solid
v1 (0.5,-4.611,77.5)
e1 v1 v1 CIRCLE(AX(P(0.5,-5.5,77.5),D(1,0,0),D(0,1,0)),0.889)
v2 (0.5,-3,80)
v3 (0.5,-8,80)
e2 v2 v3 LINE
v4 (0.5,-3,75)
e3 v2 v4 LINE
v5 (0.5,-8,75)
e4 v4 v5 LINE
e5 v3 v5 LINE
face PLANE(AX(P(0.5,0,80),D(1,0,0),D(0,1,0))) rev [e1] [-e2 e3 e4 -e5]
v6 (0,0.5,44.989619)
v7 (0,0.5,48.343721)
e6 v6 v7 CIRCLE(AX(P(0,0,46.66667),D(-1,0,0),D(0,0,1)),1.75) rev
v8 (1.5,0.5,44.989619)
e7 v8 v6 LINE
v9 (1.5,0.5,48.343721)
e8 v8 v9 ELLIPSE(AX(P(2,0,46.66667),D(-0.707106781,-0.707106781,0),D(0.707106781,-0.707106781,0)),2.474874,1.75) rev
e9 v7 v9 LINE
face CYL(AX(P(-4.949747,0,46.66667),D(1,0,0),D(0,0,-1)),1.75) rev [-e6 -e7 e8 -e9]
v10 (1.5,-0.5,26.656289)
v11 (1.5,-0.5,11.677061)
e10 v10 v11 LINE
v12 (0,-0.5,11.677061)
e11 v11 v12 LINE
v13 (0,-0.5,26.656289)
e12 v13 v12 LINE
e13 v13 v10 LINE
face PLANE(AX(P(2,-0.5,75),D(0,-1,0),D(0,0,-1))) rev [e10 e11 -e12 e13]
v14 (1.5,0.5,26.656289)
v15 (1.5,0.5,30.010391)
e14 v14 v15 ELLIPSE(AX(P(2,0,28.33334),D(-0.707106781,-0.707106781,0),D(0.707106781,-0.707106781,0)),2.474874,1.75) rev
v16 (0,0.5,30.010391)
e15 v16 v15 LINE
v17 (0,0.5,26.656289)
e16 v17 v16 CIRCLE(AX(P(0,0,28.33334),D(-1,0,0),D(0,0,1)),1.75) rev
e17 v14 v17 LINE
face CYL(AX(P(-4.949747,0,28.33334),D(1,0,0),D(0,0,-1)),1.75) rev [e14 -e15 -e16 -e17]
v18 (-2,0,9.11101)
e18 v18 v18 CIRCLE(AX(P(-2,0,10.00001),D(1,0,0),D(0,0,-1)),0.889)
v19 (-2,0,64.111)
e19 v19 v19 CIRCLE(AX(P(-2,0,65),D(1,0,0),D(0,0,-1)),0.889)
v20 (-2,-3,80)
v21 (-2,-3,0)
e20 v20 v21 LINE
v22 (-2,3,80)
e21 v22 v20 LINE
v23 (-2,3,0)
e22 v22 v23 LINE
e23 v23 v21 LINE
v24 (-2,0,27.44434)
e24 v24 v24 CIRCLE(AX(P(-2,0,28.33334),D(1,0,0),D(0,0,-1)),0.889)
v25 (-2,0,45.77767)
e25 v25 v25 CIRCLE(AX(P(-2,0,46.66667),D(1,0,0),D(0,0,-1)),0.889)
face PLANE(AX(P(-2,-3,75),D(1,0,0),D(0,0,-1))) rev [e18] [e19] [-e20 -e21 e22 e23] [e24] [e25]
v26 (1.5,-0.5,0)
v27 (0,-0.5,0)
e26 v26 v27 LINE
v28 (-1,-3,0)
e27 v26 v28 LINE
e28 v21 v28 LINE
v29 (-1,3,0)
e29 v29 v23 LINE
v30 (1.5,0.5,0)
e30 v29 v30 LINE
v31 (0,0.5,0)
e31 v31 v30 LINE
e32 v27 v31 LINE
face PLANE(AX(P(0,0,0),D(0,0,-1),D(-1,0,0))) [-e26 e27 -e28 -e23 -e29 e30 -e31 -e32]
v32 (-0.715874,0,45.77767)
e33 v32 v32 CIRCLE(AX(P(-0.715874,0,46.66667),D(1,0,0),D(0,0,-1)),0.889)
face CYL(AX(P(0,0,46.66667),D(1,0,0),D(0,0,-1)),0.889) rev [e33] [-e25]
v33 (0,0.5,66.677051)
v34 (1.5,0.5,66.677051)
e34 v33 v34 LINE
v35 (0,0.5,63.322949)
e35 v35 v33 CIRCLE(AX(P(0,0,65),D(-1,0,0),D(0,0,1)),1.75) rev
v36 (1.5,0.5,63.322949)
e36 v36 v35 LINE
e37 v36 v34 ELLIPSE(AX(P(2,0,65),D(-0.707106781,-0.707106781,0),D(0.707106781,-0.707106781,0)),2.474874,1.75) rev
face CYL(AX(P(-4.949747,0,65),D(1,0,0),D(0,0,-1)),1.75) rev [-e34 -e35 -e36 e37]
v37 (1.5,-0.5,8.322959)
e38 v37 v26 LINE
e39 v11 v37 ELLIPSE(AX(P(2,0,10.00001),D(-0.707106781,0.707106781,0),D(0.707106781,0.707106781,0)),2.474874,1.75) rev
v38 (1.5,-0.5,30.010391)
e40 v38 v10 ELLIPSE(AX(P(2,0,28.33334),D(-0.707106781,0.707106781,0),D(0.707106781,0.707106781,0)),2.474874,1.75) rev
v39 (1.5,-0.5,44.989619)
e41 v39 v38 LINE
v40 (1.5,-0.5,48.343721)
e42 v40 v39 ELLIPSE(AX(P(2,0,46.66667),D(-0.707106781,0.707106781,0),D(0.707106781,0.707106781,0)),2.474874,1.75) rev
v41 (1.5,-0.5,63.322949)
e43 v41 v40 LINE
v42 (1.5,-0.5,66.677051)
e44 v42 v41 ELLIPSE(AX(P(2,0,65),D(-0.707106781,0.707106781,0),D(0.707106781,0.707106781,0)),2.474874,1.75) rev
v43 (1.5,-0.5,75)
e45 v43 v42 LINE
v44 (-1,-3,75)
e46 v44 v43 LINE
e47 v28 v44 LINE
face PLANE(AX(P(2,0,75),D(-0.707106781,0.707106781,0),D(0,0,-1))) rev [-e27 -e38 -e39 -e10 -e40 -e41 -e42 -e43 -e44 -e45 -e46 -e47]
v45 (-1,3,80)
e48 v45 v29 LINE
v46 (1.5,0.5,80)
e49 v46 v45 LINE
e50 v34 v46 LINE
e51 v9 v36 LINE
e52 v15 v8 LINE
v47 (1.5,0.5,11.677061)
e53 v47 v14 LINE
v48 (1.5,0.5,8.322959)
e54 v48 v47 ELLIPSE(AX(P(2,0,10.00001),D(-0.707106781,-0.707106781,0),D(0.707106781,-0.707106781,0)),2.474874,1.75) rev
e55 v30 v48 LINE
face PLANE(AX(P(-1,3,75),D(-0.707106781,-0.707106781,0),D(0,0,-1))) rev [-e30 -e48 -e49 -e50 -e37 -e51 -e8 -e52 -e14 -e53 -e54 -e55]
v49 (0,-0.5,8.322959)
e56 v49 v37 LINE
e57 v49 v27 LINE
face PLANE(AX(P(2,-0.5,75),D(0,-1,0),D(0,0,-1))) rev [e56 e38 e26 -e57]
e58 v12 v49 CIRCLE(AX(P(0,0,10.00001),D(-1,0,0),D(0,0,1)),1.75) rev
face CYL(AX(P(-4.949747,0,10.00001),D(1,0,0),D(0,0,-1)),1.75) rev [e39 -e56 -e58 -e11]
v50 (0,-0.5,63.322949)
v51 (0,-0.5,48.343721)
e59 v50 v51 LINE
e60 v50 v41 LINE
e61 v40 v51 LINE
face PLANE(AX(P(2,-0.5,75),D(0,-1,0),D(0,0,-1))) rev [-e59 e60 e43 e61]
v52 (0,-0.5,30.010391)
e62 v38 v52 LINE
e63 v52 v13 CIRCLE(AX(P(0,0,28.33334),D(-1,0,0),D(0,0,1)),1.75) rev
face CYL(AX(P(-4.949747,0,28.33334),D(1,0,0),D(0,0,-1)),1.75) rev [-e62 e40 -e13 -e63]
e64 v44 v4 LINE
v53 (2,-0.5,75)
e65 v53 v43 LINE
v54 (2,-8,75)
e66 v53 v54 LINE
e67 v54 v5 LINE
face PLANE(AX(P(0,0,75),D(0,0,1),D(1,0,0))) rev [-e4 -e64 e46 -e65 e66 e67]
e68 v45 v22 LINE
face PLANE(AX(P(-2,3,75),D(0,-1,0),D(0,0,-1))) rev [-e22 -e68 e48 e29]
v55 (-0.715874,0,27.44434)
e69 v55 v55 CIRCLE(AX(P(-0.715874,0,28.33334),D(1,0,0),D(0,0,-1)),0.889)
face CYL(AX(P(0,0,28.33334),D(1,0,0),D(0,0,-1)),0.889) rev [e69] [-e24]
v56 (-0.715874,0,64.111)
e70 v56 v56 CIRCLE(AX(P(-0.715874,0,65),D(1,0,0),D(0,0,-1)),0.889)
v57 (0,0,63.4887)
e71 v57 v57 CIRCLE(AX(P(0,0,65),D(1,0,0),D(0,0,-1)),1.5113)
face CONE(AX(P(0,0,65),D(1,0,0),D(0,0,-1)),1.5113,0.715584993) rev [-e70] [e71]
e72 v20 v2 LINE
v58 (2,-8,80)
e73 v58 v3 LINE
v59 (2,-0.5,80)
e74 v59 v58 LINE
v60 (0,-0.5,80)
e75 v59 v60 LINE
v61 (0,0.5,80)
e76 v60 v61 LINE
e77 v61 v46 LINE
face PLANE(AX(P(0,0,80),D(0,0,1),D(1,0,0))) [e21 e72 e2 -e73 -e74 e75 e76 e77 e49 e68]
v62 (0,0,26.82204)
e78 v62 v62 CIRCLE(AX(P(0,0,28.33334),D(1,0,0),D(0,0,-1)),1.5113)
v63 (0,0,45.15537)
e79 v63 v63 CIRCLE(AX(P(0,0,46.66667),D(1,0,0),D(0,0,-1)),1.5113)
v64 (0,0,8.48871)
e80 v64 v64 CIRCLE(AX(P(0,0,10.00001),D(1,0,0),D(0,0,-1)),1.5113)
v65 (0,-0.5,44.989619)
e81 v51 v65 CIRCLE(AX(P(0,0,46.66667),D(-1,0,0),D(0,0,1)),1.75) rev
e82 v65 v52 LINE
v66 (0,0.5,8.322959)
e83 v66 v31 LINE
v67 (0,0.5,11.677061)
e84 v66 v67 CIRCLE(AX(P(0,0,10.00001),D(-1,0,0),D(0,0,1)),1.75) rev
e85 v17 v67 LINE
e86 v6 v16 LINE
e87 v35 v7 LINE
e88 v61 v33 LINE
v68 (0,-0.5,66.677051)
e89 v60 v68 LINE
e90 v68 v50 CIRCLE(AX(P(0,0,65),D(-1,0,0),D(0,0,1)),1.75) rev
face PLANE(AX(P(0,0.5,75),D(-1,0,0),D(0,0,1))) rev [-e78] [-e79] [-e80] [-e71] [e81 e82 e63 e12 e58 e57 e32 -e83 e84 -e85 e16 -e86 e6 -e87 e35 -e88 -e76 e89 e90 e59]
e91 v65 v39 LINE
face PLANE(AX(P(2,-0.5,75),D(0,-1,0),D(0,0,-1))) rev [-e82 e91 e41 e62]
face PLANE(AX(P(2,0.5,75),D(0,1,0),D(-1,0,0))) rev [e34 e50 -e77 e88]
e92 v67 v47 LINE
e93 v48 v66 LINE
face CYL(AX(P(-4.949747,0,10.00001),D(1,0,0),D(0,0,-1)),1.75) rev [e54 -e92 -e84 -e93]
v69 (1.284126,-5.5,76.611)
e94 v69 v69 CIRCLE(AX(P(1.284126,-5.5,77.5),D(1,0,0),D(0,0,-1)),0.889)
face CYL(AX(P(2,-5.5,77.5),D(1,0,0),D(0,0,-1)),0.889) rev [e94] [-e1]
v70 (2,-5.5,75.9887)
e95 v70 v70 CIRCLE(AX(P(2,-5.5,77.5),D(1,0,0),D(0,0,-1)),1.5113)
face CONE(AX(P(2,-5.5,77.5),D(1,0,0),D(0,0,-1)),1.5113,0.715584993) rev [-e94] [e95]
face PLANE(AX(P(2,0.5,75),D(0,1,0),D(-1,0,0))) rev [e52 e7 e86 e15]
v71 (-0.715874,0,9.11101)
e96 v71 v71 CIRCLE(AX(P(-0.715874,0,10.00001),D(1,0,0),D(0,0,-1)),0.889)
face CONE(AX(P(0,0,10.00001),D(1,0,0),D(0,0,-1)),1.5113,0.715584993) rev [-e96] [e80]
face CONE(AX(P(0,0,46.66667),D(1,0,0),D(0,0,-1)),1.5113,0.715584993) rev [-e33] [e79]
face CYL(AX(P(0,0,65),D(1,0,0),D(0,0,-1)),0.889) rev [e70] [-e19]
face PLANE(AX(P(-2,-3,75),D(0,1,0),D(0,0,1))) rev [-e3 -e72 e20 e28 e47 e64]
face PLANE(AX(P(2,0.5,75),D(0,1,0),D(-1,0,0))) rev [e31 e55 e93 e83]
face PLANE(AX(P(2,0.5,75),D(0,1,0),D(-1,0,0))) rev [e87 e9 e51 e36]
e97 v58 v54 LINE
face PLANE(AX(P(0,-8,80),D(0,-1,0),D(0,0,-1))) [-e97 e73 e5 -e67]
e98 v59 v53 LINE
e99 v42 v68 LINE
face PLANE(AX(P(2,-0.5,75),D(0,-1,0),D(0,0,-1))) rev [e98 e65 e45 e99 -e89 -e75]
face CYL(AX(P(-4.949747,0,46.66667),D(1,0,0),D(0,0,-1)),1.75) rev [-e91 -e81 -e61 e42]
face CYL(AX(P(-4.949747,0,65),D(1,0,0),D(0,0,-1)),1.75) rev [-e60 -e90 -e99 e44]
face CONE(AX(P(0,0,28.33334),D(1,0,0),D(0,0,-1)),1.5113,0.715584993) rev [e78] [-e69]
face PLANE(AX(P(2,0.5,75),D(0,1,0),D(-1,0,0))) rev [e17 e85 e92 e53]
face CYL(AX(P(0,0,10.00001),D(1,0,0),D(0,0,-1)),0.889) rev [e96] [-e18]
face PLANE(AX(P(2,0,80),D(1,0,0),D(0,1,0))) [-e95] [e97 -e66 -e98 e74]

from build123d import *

# Parameters (mm, degrees)
BOSS_EXTRUDE1_DEPTH                            = 75
SKETCH5_R                                      = 1.75
CUT_EXTRUDE1_DEPTH                             = 2
CSK_FOR_0_FLAT_HEAD_MACHINE_SCREW2_D           = 1.778
CSK_FOR_0_FLAT_HEAD_MACHINE_SCREW2_DEPTH       = 3.302
CSK_FOR_0_FLAT_HEAD_MACHINE_SCREW2_CSINK_D     = 3.0226
CSK_FOR_0_FLAT_HEAD_MACHINE_SCREW2_CSINK_ANGLE = 82
CSK_FOR_0_FLAT_HEAD_MACHINE_SCREW2_TIP         = 0.53416509
CHAMFER1_SIZE                                  = 3
SKETCH6_W                                      = 1.5
SKETCH6_H                                      = 5
BOSS_EXTRUDE2_DEPTH                            = 5
CSK_FOR_0_FLAT_HEAD_MACHINE_SCREW1_D           = 1.778
CSK_FOR_0_FLAT_HEAD_MACHINE_SCREW1_DEPTH       = 3.302
CSK_FOR_0_FLAT_HEAD_MACHINE_SCREW1_CSINK_D     = 3.0226
CSK_FOR_0_FLAT_HEAD_MACHINE_SCREW1_CSINK_ANGLE = 82
CSK_FOR_0_FLAT_HEAD_MACHINE_SCREW1_TIP         = 0.53416509


with BuildPart() as part:
    # Sketch1 → Boss-Extrude1 (new body)
    with BuildSketch(Plane.XY):
        Polygon((-2, -3), (2, -3), (2, -0.5), (0, -0.5), (0, 0.5), (2, 0.5), (2, 3), (-2, 3), align=None)
    extrude(amount=BOSS_EXTRUDE1_DEPTH)

    # Sketch5 → Cut-Extrude1 (cut)
    with BuildSketch(Plane(origin=(2, 0, 0), x_dir=(0, 0, -1), z_dir=(1, 0, 0))):
        with Locations((-65, 0)):
            Circle(SKETCH5_R)
        with Locations((-46.66667, 0)):
            Circle(SKETCH5_R)
        with Locations((-28.33334, 0)):
            Circle(SKETCH5_R)
        with Locations((-10.00001, 0)):
            Circle(SKETCH5_R)
    extrude(amount=-CUT_EXTRUDE1_DEPTH, mode=Mode.SUBTRACT)

    # CSK for #0 Flat Head Machine Screw2
    with Locations(Plane(origin=(0, 0, 0), x_dir=(0, 0, -1), z_dir=(1, 0, 0))):
        with Locations((-65, 0), (-10.00001, 0), (-46.66667, 0), (-28.33334, 0)):
            CounterSinkHole(CSK_FOR_0_FLAT_HEAD_MACHINE_SCREW2_D / 2, CSK_FOR_0_FLAT_HEAD_MACHINE_SCREW2_CSINK_D / 2, depth=CSK_FOR_0_FLAT_HEAD_MACHINE_SCREW2_DEPTH, counter_sink_angle=CSK_FOR_0_FLAT_HEAD_MACHINE_SCREW2_CSINK_ANGLE)
            with Locations((0, 0, -(CSK_FOR_0_FLAT_HEAD_MACHINE_SCREW2_DEPTH + CSK_FOR_0_FLAT_HEAD_MACHINE_SCREW2_TIP / 2))):  # 118° drill point
                Cone(0, CSK_FOR_0_FLAT_HEAD_MACHINE_SCREW2_D / 2, CSK_FOR_0_FLAT_HEAD_MACHINE_SCREW2_TIP, mode=Mode.SUBTRACT)

    # Chamfer1
    # the kernel refuses this chamfer: 3 mm, written as the material it takes off along each edge
    with BuildSketch(Plane(origin=(2, -3, -7.715048964), x_dir=(-0.9996219169112968, -0.027495876610586348, 0), z_dir=(0, 0, 1))) as chamfer1_piece_1:
        Polygon((CHAMFER1_SIZE * 0.999621916911, -CHAMFER1_SIZE * 0.0274958766106), (-CHAMFER1_SIZE * 0.0274958766106, -CHAMFER1_SIZE * 0.999621916911), (0, 0), align=None)
    extrude(amount=90.430097928, mode=Mode.SUBTRACT)
    with BuildSketch(Plane(origin=(2, 3, -7.715048964), x_dir=(-0.9996219169112968, 0.027495876610586348, 0), z_dir=(0, 0, 1))) as chamfer1_piece_2:
        Polygon((CHAMFER1_SIZE * 0.999621916911, CHAMFER1_SIZE * 0.0274958766106), (-CHAMFER1_SIZE * 0.0274958766106, CHAMFER1_SIZE * 0.999621916911), (0, 0), align=None)
    extrude(amount=90.430097928, mode=Mode.SUBTRACT)

    # Sketch6 → Boss-Extrude2 (add)
    with BuildSketch(Plane.XY.offset(75)):
        Polygon((-2, 3), (-2, -3), (-1, -3), (1.5, -0.5), (0, -0.5), (0, 0.5), (1.5, 0.5), (-1, 3), align=None)
        Polygon((1.5, -0.5), (-1, -3), (0.5, -3), (2, -3), (2, -0.5), align=None)
        with Locations((1.25, -5.5)):
            Rectangle(SKETCH6_W, SKETCH6_H)
    extrude(amount=BOSS_EXTRUDE2_DEPTH)

    # CSK for #0 Flat Head Machine Screw1
    with Locations(Plane(origin=(2, 0, 0), x_dir=(0, 0, -1), z_dir=(1, 0, 0))):
        with Locations((-77.5, -5.5)):
            CounterSinkHole(CSK_FOR_0_FLAT_HEAD_MACHINE_SCREW1_D / 2, CSK_FOR_0_FLAT_HEAD_MACHINE_SCREW1_CSINK_D / 2, depth=CSK_FOR_0_FLAT_HEAD_MACHINE_SCREW1_DEPTH, counter_sink_angle=CSK_FOR_0_FLAT_HEAD_MACHINE_SCREW1_CSINK_ANGLE)
            with Locations((0, 0, -(CSK_FOR_0_FLAT_HEAD_MACHINE_SCREW1_DEPTH + CSK_FOR_0_FLAT_HEAD_MACHINE_SCREW1_TIP / 2))):  # 118° drill point
                Cone(0, CSK_FOR_0_FLAT_HEAD_MACHINE_SCREW1_D / 2, CSK_FOR_0_FLAT_HEAD_MACHINE_SCREW1_TIP, mode=Mode.SUBTRACT)


solid = part.part
